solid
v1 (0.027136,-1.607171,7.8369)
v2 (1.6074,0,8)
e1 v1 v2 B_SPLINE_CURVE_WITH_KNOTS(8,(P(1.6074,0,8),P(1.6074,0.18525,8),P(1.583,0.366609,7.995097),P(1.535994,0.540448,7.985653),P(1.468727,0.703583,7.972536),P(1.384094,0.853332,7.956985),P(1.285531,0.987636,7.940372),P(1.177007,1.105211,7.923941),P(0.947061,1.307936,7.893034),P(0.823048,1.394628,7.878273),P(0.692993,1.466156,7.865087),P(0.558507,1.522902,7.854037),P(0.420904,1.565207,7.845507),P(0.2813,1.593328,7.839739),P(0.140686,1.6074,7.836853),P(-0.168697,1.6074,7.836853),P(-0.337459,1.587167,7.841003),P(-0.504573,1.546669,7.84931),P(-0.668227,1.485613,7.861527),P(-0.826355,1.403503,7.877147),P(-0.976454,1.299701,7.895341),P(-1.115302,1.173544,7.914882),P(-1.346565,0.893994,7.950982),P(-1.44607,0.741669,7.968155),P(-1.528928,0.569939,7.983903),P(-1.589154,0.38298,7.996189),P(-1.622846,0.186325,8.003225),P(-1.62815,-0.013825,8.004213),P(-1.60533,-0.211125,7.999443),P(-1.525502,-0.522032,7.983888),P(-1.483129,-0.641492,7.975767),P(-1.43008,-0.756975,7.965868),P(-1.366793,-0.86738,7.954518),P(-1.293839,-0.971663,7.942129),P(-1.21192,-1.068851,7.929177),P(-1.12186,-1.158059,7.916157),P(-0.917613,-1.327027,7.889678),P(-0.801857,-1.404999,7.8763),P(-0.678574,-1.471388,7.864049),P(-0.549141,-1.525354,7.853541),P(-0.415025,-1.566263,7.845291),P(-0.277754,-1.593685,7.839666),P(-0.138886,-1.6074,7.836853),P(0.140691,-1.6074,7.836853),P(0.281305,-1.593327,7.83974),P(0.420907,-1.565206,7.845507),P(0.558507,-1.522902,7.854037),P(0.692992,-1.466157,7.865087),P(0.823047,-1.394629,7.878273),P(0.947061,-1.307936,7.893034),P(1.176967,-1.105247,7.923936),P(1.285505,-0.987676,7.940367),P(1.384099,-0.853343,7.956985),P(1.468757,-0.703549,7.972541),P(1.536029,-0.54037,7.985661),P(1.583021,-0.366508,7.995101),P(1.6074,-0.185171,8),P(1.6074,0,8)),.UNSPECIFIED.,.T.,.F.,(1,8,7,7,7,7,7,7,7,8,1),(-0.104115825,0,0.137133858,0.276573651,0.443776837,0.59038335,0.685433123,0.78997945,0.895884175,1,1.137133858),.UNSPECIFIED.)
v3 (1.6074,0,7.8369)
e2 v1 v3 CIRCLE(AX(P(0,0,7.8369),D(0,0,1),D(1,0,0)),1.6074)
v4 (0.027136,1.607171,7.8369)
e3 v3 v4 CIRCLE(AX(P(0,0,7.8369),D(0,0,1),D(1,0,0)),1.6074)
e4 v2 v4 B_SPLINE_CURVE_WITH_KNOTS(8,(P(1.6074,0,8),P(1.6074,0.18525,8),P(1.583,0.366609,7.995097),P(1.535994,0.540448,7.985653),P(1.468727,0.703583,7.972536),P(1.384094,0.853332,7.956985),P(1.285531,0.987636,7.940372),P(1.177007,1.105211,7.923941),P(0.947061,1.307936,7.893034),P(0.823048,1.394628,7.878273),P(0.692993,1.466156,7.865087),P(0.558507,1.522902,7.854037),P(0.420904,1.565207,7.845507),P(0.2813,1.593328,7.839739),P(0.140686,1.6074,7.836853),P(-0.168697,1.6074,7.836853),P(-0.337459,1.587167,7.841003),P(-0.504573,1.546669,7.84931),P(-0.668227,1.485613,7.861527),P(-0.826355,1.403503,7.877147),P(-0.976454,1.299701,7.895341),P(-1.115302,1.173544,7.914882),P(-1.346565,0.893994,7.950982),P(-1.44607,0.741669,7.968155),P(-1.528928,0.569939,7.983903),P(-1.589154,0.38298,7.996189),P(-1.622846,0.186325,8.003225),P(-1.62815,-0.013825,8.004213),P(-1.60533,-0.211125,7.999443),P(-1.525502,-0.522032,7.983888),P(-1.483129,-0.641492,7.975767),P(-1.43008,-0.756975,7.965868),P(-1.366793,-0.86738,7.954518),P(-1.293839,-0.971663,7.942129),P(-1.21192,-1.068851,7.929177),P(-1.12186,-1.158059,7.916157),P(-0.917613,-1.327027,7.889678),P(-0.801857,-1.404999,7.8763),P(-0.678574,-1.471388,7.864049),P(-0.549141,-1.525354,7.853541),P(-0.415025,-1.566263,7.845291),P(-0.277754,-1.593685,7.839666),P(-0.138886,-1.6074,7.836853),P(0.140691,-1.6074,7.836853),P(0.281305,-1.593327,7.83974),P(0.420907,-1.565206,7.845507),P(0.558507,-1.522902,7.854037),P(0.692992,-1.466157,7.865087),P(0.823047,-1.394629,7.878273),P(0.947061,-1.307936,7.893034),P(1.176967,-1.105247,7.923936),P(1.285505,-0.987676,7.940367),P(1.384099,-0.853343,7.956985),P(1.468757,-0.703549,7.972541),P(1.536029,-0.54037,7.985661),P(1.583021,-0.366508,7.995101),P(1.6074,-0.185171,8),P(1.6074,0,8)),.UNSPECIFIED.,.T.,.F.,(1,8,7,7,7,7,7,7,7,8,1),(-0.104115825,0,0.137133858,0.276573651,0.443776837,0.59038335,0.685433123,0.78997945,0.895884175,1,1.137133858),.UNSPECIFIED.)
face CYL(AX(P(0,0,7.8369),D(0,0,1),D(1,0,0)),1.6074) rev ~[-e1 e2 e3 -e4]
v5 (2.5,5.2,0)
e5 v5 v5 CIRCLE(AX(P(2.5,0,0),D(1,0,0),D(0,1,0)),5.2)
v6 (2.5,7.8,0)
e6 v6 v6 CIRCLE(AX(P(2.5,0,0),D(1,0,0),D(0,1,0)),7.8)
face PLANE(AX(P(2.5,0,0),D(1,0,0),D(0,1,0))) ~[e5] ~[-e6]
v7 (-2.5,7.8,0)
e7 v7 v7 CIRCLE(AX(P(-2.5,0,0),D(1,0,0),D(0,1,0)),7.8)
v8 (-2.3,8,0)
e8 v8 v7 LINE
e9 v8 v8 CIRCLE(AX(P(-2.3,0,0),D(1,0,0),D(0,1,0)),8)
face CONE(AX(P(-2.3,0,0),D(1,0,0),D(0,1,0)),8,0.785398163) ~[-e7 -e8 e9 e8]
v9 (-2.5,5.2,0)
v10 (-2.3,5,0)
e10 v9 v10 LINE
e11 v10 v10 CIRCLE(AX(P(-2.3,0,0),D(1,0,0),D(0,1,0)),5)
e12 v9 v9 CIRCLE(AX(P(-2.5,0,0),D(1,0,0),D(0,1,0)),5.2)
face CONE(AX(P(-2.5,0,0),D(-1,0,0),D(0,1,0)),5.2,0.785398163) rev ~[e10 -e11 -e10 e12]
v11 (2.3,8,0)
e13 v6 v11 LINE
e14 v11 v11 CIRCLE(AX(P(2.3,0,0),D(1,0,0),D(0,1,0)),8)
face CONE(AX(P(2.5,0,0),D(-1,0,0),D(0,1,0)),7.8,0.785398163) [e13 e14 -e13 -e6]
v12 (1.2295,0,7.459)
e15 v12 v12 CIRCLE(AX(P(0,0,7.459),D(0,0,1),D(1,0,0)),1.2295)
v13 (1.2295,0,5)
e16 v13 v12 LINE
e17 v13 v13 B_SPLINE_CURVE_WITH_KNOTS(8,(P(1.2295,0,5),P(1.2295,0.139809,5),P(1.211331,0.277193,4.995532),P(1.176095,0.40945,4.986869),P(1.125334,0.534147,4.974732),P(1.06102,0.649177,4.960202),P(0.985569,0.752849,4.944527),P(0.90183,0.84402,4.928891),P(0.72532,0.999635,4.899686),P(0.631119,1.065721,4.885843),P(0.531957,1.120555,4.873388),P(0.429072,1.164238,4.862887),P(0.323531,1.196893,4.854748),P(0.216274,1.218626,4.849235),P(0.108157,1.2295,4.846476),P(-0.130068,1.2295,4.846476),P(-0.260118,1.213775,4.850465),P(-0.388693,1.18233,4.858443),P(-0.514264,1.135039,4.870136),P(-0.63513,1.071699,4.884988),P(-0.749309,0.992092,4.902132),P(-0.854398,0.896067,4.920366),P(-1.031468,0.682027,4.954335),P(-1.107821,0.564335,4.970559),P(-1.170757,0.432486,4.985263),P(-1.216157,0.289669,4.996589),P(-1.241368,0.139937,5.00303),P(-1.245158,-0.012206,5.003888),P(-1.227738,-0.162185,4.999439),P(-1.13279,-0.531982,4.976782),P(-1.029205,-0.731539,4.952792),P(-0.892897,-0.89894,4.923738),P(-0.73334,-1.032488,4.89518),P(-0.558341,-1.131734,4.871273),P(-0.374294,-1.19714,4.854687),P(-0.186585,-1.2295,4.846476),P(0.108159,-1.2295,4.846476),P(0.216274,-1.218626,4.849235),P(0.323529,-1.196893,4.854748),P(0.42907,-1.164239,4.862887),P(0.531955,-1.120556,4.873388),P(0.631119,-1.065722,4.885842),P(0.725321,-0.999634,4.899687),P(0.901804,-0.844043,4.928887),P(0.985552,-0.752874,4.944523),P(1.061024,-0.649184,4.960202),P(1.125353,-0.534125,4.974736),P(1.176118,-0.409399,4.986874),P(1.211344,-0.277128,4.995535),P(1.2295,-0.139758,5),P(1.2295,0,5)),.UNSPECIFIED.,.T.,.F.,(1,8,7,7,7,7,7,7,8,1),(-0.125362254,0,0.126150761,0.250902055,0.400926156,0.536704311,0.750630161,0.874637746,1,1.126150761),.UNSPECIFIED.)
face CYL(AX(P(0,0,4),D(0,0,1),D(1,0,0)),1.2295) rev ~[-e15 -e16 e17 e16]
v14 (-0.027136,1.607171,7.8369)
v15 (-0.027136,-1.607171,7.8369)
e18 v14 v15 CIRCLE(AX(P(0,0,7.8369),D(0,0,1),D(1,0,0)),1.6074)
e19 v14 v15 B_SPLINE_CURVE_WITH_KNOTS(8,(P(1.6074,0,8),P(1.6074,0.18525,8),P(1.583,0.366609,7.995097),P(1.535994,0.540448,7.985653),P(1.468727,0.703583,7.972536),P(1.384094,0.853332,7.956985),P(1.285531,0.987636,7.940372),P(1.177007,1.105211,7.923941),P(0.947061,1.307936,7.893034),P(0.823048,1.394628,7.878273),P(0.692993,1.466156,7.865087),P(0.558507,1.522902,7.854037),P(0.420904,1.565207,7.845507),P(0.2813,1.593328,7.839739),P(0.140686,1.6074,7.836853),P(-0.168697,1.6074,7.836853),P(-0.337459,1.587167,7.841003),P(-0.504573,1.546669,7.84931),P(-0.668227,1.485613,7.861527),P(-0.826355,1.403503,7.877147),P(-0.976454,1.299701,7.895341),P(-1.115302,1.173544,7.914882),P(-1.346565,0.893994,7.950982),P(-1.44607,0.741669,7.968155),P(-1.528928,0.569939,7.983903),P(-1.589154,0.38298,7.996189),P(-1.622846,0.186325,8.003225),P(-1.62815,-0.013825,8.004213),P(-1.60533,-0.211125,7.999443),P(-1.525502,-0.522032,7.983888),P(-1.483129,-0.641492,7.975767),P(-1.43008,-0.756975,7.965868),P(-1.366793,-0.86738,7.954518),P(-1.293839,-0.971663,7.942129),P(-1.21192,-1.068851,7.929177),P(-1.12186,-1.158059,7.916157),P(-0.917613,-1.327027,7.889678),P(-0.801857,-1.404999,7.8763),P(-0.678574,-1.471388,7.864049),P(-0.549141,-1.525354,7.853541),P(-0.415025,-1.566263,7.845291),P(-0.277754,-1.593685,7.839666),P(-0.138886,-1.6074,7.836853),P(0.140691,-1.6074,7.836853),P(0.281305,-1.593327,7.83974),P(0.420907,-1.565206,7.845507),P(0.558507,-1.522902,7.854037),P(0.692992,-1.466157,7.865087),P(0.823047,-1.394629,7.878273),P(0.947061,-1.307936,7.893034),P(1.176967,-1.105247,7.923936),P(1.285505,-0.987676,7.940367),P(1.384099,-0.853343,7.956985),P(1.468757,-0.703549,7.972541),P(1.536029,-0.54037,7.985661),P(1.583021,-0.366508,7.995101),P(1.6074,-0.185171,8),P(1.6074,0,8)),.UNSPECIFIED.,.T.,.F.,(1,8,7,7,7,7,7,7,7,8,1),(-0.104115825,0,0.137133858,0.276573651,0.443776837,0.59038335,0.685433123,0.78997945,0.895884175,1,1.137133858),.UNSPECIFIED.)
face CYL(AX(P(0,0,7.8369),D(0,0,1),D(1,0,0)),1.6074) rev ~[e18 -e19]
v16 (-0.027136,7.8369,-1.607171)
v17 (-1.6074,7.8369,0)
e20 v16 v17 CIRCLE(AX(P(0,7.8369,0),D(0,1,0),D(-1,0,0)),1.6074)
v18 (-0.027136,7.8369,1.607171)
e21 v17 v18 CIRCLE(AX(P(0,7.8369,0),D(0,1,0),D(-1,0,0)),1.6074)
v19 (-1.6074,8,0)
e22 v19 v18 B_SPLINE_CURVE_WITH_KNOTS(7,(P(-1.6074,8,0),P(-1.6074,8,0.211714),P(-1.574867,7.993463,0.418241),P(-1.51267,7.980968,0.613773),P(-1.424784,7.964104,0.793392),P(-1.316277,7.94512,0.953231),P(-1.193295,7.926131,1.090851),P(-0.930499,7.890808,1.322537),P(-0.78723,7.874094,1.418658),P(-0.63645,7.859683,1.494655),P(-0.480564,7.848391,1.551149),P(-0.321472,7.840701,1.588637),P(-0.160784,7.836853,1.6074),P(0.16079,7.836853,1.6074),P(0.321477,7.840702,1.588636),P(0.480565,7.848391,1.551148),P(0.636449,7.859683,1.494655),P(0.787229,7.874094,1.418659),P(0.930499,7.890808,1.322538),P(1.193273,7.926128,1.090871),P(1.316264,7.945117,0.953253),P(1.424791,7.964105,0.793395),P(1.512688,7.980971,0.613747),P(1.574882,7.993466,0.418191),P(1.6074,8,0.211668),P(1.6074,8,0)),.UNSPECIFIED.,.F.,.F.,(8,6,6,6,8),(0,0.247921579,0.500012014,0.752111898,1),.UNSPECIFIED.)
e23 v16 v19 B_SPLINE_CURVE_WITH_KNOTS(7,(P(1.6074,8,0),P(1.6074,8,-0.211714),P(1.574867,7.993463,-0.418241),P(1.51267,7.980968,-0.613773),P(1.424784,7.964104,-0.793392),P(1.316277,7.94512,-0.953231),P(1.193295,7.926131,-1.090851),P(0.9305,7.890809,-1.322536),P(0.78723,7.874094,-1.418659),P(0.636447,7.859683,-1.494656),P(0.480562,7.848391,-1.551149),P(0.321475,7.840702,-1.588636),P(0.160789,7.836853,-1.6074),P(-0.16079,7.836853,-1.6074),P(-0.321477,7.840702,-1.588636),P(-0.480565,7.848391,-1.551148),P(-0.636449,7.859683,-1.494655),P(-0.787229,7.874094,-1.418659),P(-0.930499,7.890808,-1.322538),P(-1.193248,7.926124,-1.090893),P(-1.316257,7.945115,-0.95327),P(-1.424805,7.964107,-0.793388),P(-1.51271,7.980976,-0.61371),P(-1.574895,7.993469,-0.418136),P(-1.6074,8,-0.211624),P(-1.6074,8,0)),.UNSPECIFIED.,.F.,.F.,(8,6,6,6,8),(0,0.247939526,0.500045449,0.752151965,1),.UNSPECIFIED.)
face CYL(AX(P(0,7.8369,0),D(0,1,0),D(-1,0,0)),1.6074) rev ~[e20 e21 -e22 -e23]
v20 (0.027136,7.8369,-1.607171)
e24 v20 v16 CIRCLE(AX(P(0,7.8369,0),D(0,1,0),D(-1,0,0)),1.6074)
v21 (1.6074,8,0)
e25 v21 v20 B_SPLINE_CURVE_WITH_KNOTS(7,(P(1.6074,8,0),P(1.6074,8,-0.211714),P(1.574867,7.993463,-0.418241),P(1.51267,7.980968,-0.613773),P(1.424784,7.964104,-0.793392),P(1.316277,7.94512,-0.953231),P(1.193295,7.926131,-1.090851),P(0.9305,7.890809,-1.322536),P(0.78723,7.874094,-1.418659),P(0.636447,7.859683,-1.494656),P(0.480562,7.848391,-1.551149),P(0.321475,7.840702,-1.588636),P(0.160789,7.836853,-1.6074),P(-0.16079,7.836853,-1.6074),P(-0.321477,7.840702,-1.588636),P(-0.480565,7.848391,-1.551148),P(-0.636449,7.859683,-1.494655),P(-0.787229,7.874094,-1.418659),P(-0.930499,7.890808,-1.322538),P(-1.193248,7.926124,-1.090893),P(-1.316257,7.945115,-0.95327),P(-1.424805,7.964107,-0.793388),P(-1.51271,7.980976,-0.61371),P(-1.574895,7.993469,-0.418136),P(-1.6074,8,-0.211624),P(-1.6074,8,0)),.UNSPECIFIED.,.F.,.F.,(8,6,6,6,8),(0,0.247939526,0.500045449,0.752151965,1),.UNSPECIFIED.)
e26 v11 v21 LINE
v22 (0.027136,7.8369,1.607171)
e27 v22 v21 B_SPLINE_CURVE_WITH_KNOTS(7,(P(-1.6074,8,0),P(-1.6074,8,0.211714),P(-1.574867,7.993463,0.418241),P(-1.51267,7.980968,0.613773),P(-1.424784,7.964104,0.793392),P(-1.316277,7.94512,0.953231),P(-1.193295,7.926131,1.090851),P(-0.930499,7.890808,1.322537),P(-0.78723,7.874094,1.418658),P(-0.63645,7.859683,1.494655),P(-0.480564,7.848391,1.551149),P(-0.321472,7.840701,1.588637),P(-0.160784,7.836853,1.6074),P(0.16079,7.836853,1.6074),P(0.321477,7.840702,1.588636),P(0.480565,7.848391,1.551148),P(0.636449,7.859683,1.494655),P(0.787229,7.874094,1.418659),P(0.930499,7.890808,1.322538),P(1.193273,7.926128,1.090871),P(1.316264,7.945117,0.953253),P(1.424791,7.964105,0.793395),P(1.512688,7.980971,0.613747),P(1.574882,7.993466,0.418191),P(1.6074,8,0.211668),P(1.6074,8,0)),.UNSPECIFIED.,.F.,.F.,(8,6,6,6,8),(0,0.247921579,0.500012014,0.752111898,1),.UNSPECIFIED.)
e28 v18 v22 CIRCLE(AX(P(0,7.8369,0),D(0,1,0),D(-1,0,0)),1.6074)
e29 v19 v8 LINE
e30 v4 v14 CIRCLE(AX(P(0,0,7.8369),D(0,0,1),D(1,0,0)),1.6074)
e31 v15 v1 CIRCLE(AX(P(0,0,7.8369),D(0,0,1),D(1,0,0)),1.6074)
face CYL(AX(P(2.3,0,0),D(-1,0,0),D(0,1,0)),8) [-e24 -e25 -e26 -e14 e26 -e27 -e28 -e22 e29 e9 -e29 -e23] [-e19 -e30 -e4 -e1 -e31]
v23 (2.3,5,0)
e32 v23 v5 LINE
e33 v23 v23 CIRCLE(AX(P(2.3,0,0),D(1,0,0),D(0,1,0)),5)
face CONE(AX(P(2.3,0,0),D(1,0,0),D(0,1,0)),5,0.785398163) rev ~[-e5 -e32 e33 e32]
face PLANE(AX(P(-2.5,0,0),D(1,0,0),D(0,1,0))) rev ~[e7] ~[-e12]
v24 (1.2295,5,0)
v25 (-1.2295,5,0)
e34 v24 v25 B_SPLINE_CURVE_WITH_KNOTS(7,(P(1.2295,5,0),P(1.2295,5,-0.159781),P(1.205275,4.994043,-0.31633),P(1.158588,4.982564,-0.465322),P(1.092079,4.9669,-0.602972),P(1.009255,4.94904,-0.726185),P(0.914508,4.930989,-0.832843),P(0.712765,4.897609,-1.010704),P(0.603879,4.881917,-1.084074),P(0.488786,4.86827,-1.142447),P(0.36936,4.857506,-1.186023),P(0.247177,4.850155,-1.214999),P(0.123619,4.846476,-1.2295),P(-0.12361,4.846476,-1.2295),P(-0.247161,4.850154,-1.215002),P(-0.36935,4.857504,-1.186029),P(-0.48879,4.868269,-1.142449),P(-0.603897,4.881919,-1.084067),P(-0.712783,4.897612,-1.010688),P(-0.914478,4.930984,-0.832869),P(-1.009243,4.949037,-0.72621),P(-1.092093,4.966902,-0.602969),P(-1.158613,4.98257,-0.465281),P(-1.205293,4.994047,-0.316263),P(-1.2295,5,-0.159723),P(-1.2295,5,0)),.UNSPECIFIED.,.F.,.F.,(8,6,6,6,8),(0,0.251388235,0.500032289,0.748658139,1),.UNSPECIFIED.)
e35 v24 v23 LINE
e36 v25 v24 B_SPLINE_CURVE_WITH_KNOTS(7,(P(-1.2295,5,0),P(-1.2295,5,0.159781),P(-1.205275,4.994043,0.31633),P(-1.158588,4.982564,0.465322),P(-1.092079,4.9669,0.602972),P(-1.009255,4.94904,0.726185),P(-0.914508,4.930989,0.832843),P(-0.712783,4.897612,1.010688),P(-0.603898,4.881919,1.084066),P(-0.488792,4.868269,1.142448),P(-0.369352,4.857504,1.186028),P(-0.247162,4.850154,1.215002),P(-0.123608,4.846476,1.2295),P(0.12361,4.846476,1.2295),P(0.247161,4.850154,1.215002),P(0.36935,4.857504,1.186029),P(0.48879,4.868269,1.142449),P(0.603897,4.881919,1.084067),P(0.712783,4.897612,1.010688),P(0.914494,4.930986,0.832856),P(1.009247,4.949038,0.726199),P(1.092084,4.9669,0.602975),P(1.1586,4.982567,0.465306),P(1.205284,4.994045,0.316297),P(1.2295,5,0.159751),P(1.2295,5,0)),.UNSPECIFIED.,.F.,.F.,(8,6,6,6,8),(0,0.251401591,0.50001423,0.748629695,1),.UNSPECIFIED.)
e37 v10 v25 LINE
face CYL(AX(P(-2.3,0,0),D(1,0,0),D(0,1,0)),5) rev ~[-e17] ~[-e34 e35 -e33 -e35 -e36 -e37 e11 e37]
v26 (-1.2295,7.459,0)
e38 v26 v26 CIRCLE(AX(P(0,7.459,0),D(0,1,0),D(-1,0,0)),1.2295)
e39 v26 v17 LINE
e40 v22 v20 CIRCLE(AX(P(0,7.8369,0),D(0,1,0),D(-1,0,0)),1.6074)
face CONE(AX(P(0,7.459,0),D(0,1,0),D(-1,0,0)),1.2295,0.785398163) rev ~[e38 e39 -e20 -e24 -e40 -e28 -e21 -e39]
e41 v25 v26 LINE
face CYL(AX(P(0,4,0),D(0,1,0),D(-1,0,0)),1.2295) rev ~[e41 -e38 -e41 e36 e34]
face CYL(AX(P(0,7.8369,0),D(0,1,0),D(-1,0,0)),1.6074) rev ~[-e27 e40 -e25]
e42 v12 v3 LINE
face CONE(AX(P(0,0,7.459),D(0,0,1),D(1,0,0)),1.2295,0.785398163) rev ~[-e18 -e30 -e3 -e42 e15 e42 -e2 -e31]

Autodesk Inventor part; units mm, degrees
sketch "Sketch_1" plane through (0, 0, 0) normal (0, 0, 1) x (1, 0, 0)
  line L0 (2, 0) -> (-2, 0)
  line L1 (-2.5, 5.2) -> (-2.3, 5)
  line L2 (-2.3, 5) -> (2.3, 5)
  line L3 (2.3, 5) -> (2.5, 5.2)
  line L4 (2.5, 5.2) -> (2.5, 7.8)
  line L5 (2.5, 7.8) -> (2.3, 8)
  line L6 (2.3, 8) -> (-2.3, 8)
  line L7 (-2.3, 8) -> (-2.5, 7.8)
  line L8 (-2.5, 7.8) -> (-2.5, 5.2)
revolve "Revolution1" add sketch "Sketch_1" angle 360 about axis through (2, 0, 0) along (1, 0, 0)
sketch "Sketch_2" plane through (0, 0, 0) normal (0, 1, 0) x (-1, 0, 0)
  line L0 (0, 8) -> (0, 5)
  line L1 (0, 4) -> (-1.2295, 4)
  line L2 (-1.2295, 4) -> (-1.2295, 7.459)
  line L3 (-1.2295, 7.459) -> (-1.6074, 7.8369)
  line L4 (-1.6074, 7.8369) -> (-1.6074, 8.25)
  line L5 (-1.6074, 8.25) -> (0, 8.25)
  line L6 (0, 8.25) -> (0, 4)
revolve "Revolution2" cut sketch "Sketch_2" angle 360 about axis through (0, 0, 8) along (0, 0, 1)
thread "Thread1" size "M3x0.5" class "6H" standard "ISO Metric profile" length 2.459
sketch "Sketch_6" plane through (0, 0, 0) normal (0, 0, 1) x (1, 0, 0)
  line L0 (0, 8) -> (0, 5)
  line L1 (0, 4) -> (-1.2295, 4)
  line L2 (-1.2295, 4) -> (-1.2295, 7.459)
  line L3 (-1.2295, 7.459) -> (-1.6074, 7.8369)
  line L4 (-1.6074, 7.8369) -> (-1.6074, 8.25)
  line L5 (-1.6074, 8.25) -> (0, 8.25)
  line L6 (0, 8.25) -> (0, 4)
revolve "Revolution3" cut sketch "Sketch_6" angle 360 about axis through (0, 8, 0) along (0, 1, 0)
thread "Thread2" size "M3x0.5" class "6H" standard "ISO Metric profile" length 2.459
ref_plane "to_screw1_XY" through (0, 5, 0) normal (0, 1, 0) x (1, 0, 0)
ref_plane "to_screw1_YZ" through (0, 5, 0) normal (1, 0, 0) x (0, 0, -1)
ref_plane "to_screw1_ZX" through (0, 5, 0) normal (0, 0, -1) x (0, 1, 0)
ref_plane "to_screw2_XY" through (0, 0, 5) normal (0, 0, 1) x (1, 0, 0)
ref_plane "to_screw2_YZ" through (0, 0, 5) normal (1, 0, 0) x (0, 1, 0)
ref_plane "to_screw2_ZX" through (0, 0, 5) normal (0, 1, 0) x (0, 0, 1)
properties part number "SCCJ10-5_b"
